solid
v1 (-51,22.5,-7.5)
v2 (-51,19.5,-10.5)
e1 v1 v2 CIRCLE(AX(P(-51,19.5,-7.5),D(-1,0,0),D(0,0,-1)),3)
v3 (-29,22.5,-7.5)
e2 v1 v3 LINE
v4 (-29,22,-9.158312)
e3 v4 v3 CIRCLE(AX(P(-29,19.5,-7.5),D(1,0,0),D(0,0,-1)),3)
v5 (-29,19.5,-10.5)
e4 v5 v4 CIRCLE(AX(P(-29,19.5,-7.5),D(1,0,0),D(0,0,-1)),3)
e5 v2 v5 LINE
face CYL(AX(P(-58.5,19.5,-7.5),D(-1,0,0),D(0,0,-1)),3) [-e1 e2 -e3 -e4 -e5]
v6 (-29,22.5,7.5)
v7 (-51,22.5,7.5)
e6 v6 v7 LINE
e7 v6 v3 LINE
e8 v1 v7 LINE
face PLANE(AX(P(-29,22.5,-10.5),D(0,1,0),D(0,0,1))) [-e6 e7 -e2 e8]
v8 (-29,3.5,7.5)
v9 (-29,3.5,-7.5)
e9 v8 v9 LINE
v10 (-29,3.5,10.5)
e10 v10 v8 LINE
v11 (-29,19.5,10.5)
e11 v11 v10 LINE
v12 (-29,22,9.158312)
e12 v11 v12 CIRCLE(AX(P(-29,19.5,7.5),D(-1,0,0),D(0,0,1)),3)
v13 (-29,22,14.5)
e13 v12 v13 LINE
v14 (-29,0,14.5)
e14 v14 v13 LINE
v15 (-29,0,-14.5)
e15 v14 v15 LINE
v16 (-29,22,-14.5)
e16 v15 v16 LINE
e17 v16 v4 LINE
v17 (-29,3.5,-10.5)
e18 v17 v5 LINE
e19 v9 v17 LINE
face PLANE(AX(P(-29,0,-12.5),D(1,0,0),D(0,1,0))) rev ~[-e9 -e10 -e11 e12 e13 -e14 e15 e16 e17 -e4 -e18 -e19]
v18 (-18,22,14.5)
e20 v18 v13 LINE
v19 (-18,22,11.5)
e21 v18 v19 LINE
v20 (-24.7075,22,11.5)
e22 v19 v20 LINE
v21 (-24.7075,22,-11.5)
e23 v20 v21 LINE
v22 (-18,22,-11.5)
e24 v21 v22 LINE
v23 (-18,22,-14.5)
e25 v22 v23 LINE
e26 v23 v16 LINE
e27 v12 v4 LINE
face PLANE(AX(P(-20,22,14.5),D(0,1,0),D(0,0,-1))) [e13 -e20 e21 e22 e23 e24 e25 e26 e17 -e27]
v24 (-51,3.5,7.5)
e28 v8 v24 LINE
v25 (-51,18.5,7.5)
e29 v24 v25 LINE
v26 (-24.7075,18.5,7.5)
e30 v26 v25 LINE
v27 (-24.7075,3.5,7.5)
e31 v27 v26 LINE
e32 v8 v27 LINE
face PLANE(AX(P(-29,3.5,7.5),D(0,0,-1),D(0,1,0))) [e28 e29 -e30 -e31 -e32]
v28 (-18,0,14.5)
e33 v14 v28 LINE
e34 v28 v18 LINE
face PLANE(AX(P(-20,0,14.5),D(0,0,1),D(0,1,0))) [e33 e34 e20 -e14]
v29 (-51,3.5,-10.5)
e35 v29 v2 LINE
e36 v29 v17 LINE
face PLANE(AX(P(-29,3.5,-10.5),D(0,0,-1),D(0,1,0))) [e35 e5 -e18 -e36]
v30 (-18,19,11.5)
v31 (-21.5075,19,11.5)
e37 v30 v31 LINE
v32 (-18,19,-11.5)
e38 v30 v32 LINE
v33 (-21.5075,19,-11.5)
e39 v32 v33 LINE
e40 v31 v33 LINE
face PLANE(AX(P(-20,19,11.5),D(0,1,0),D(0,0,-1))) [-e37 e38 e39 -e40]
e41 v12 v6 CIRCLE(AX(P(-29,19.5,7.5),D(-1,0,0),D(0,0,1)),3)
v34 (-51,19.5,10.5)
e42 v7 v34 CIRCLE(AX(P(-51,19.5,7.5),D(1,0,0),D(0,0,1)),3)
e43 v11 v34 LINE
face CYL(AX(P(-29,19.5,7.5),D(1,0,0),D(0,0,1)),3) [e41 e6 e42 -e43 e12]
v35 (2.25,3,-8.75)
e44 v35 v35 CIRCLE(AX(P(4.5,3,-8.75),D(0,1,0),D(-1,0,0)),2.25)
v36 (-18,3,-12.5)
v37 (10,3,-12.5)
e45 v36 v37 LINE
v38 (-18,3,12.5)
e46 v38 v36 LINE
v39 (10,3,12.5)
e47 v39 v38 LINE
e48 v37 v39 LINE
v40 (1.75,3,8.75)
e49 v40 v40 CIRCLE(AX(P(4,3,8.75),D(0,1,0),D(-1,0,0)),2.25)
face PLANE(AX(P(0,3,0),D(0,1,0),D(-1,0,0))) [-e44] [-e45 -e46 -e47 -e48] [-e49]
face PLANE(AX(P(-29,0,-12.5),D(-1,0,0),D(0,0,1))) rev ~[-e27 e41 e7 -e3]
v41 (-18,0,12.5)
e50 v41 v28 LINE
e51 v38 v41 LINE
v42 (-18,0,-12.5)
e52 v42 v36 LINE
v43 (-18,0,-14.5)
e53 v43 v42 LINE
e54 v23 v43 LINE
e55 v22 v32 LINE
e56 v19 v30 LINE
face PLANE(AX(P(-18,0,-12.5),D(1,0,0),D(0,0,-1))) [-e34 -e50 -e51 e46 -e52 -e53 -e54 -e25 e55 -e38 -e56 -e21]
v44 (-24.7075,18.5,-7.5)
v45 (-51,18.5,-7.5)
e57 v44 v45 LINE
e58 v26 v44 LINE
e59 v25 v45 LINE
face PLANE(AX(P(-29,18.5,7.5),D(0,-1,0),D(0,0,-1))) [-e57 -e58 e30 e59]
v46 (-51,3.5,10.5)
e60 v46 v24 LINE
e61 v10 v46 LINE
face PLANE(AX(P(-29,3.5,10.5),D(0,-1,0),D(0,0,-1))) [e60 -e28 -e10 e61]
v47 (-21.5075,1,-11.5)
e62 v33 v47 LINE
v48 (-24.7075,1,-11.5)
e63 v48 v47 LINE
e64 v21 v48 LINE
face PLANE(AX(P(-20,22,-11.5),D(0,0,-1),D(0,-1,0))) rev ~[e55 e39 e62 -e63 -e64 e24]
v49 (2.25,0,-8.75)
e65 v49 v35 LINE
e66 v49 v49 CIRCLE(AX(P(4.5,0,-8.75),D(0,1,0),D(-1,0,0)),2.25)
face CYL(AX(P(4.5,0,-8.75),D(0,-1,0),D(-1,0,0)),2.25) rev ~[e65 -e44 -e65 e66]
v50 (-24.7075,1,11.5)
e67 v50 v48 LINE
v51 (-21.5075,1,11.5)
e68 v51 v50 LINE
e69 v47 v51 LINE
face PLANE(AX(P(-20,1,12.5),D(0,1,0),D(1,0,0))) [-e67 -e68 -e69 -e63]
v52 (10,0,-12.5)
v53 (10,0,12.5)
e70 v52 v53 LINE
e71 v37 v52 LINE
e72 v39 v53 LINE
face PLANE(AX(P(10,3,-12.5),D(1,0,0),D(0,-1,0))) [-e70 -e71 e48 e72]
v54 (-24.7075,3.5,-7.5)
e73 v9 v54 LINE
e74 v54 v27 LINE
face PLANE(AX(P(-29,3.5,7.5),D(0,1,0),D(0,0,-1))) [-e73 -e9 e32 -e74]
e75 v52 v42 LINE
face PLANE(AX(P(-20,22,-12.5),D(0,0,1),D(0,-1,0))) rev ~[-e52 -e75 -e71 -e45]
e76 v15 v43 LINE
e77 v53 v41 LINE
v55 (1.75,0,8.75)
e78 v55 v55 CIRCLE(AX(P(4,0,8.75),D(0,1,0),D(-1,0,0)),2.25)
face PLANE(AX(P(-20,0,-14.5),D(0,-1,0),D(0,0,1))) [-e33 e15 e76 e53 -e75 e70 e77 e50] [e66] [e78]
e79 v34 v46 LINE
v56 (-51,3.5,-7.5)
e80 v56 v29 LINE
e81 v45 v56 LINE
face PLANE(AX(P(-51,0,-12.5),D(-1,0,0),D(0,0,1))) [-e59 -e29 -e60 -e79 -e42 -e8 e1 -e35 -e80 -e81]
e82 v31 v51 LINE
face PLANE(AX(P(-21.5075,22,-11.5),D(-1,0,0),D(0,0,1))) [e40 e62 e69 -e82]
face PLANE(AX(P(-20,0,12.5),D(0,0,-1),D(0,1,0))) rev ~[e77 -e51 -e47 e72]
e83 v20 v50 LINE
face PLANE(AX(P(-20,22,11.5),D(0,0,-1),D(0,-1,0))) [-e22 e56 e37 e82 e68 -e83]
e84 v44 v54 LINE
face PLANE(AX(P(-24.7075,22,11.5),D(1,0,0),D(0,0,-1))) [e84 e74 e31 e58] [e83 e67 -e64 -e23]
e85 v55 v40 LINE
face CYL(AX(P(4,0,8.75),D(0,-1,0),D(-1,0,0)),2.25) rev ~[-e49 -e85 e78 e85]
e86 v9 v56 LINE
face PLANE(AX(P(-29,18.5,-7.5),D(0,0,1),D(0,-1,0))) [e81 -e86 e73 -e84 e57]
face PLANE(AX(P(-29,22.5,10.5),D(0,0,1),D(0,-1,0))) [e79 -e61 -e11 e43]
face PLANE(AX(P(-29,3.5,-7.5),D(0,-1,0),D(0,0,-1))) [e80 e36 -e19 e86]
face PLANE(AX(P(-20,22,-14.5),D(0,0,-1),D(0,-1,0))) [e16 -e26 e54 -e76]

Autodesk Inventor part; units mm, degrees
ref_plane "YZ Plane" through (0, 0, 0) normal (1, 0, 0) x (0, 1, 0)
ref_plane "XZ Plane" through (0, 0, 0) normal (0, 1, 0) x (-1, 0, 0)
ref_plane "XY Plane" through (0, 0, 0) normal (0, 0, 1) x (1, 0, 0)
sketch "Sketch1" plane through (0, 0, 0) normal (0, 1, 0) x (-1, 0, 0)
  line L0 (-20, 12.5) -> (20, 12.5)
  line L1 (20, 12.5) -> (20, -12.5)
  line L2 (20, -12.5) -> (-20, -12.5)
  line L3 (-20, -12.5) -> (-20, 12.5)
  line L4 (-20, 12.5) -> (20, -12.5) construction
  line L5 (20, 12.5) -> (-20, -12.5) construction
  circle A0 centre (-4, 8.75) radius 2.25
  circle A1 centre (-4.5, -8.75) radius 2.25
  point P0 (0, 0)
  dimension "d0" = 40
  dimension "d1" = 25
  dimension "d49" = 4.5
  dimension "d50" = 4.5
extrude "Extrusion1" add sketch "Sketch1" along normal blind 3 contours L0 L1 L2 L3 | A0 | A1
sketch "Sketch3" plane through (-20, 0, -12.5) normal (-1, 0, 0) x (0, 0, 1)
  line L0 (0, 0) -> (25, 0) projected
  line L1 (0, 0) -> (25, 0)
  line L2 (25, 0) -> (25, 22)
  line L3 (25, 22) -> (0, 22)
  line L4 (0, 22) -> (0, 0)
  point P0 (12.5, 0)
  dimension "d14" = 22
extrude "Extrusion4" add sketch "Sketch3" along normal blind 9
sketch "Sketch4" plane through (-20, 22, 12.5) normal (0, 1, 0) x (1, 0, 0)
  line L0 (-4.7075, 24) -> (-1.5075, 24)
  line L1 (-1.5075, 24) -> (-1.5075, 1)
  line L2 (-1.5075, 1) -> (-4.7075, 1)
  line L3 (-4.7075, 1) -> (-4.7075, 24)
  point P0 (20, 12.5)
  dimension "d17" = 3.2
  dimension "d18" = 23
extrude "Extrusion5" cut sketch "Sketch4" against normal blind 21
sketch "Sketch6" plane through (-21.5075, 22, -11.5) normal (-1, 0, 0) x (0, 0, 1)
  line L0 (0, 0) -> (23, 0) projected
  line L1 (0, 0) -> (23, 0)
  line L2 (23, 0) -> (23, -3)
  line L3 (23, -3) -> (0, -3)
  line L4 (0, -3) -> (0, 0)
  point P0 (11.5, -22)
  dimension "d26" = 3
extrude "Extrusion7" cut sketch "Sketch6" against normal blind 3
sketch "Sketch5" plane through (-29, 0, -12.5) normal (-1, 0, 0) x (0, 0, 1)
  line L0 (20, 18.5) -> (20, 3.5)
  line L1 (20, 3.5) -> (5, 3.5)
  line L2 (5, 3.5) -> (5, 18.5)
  line L3 (5, 18.5) -> (20, 18.5)
  point P0 (12.5, 0)
  dimension "d21" = 15
  dimension "d22" = 15
extrude "Extrusion6" cut sketch "Sketch5" against normal blind 7
sketch "Sketch7" plane through (-29, 0, -12.5) normal (-1, 0, 0) x (0, 0, 1)
  line L0 (20, 3.5) -> (5, 3.5) projected
  line L1 (5, 3.5) -> (2, 3.5)
  line L2 (2, 3.5) -> (2, 22.5)
  line L3 (2, 22.5) -> (5, 22.5)
  line L4 (5, 22.5) -> (5, 3.5)
  line L5 (5, 22.5) -> (20, 22.5)
  line L6 (20, 22.5) -> (20, 18.5)
  line L7 (20, 18.5) -> (5, 18.5)
  line L8 (5, 18.5) -> (5, 22.5)
  line L9 (20, 3.5) -> (20, 22.5)
  line L10 (20, 22.5) -> (23, 22.5)
  line L11 (23, 22.5) -> (23, 3.5)
  line L12 (23, 3.5) -> (20, 3.5)
  line L13 (25, 0) -> (25, 22) projected
  point P0 (12.5, 0)
  dimension "d29" = 3
  dimension "d30" = 19
  dimension "d31" = 15
  dimension "d32" = 3
extrude "Extrusion8" add sketch "Sketch7" along normal blind 1 contours L1 L2 L3 L4
extrude "Extrusion9" add sketch "Sketch7" along normal blind 22 contours L9 L6 L10 L11 L12 | L7 L4 L5 L6
extrude "Extrusion10" add sketch "Sketch7" along normal blind 22 contours L1 L2 L3 L4
sketch "Sketch8" plane through (20, 0, 12.5) normal (0, 0, 1) x (1, 0, 0)
  line L0 (-40, 22) -> (-49, 22) projected
  line L1 (-49, 22) -> (-40, 22)
  line L2 (-40, 22) -> (-40, 0)
  line L3 (-40, 0) -> (-49, 0)
  line L4 (-49, 0) -> (-49, 22)
  point P0 (-20, 0)
extrude "Extrusion11" add sketch "Sketch8" along normal blind 2
sketch "Sketch9" plane through (20, 0, -12.5) normal (0, 0, -1) x (-1, 0, 0)
  line L0 (40, 22) -> (44.7075, 22) projected
  line L1 (49, 22) -> (40, 22)
  line L2 (40, 22) -> (40, 0)
  line L3 (40, 0) -> (49, 0)
  line L4 (49, 0) -> (49, 22)
  point P0 (20, 0)
extrude "Extrusion12" add sketch "Sketch9" along normal blind 2
sketch "Sketch10" plane through (-20, 0, -12.5) normal (1, 0, 0) x (0, 0, -1)
  line L0 (-27, 0) -> (-27, 22) projected
  line L1 (2, 22) -> (2, 0) projected
  line L2 (-27, 22) -> (2, 22)
  line L3 (2, 22) -> (2, 0)
  line L4 (2, 0) -> (-27, 0)
  line L5 (-27, 0) -> (-27, 22)
  point P0 (-12.5, 0)
extrude "Extrusion13" add sketch "Sketch10" along normal blind 2
sketch "Sketch11" plane through (-20, 0, -12.5) normal (-1, 0, 0) x (0, 0, 1)
  line L0 (1, 22) -> (1, 19) projected
  line L1 (1, 22) -> (24, 22) projected
  line L2 (1, 19) -> (1, 22)
  line L3 (1, 22) -> (24, 22)
  line L4 (24, 22) -> (24, 19)
  line L5 (24, 19) -> (1, 19)
  point P0 (12.5, 0)
extrude "Extrusion14" cut sketch "Sketch11" against normal blind 2
extrude "Extrusion15" cut sketch "Sketch1" along normal blind 3 contours A0 | A1
fillet "Fillet2" radius 3 2 edges at (-40, 22.5, 10.5) (-40, 22.5, -10.5)
sketch "Sketch12" plane through (20, 0, -12.5) normal (0, 0, -1) x (-1, 0, 0)
  line L0 (0, 3) -> (38, 3) projected
  line L1 (0, 3) -> (10, 3)
  line L2 (10, 3) -> (10, 0)
  line L3 (10, 0) -> (0, 0)
  line L4 (0, 0) -> (0, 3)
  point P0 (20, 0)
  dimension "d54" = 10
extrude "Extrusion16" cut sketch "Sketch12" against normal blind 25
properties part number "rgb-mount-group2"
